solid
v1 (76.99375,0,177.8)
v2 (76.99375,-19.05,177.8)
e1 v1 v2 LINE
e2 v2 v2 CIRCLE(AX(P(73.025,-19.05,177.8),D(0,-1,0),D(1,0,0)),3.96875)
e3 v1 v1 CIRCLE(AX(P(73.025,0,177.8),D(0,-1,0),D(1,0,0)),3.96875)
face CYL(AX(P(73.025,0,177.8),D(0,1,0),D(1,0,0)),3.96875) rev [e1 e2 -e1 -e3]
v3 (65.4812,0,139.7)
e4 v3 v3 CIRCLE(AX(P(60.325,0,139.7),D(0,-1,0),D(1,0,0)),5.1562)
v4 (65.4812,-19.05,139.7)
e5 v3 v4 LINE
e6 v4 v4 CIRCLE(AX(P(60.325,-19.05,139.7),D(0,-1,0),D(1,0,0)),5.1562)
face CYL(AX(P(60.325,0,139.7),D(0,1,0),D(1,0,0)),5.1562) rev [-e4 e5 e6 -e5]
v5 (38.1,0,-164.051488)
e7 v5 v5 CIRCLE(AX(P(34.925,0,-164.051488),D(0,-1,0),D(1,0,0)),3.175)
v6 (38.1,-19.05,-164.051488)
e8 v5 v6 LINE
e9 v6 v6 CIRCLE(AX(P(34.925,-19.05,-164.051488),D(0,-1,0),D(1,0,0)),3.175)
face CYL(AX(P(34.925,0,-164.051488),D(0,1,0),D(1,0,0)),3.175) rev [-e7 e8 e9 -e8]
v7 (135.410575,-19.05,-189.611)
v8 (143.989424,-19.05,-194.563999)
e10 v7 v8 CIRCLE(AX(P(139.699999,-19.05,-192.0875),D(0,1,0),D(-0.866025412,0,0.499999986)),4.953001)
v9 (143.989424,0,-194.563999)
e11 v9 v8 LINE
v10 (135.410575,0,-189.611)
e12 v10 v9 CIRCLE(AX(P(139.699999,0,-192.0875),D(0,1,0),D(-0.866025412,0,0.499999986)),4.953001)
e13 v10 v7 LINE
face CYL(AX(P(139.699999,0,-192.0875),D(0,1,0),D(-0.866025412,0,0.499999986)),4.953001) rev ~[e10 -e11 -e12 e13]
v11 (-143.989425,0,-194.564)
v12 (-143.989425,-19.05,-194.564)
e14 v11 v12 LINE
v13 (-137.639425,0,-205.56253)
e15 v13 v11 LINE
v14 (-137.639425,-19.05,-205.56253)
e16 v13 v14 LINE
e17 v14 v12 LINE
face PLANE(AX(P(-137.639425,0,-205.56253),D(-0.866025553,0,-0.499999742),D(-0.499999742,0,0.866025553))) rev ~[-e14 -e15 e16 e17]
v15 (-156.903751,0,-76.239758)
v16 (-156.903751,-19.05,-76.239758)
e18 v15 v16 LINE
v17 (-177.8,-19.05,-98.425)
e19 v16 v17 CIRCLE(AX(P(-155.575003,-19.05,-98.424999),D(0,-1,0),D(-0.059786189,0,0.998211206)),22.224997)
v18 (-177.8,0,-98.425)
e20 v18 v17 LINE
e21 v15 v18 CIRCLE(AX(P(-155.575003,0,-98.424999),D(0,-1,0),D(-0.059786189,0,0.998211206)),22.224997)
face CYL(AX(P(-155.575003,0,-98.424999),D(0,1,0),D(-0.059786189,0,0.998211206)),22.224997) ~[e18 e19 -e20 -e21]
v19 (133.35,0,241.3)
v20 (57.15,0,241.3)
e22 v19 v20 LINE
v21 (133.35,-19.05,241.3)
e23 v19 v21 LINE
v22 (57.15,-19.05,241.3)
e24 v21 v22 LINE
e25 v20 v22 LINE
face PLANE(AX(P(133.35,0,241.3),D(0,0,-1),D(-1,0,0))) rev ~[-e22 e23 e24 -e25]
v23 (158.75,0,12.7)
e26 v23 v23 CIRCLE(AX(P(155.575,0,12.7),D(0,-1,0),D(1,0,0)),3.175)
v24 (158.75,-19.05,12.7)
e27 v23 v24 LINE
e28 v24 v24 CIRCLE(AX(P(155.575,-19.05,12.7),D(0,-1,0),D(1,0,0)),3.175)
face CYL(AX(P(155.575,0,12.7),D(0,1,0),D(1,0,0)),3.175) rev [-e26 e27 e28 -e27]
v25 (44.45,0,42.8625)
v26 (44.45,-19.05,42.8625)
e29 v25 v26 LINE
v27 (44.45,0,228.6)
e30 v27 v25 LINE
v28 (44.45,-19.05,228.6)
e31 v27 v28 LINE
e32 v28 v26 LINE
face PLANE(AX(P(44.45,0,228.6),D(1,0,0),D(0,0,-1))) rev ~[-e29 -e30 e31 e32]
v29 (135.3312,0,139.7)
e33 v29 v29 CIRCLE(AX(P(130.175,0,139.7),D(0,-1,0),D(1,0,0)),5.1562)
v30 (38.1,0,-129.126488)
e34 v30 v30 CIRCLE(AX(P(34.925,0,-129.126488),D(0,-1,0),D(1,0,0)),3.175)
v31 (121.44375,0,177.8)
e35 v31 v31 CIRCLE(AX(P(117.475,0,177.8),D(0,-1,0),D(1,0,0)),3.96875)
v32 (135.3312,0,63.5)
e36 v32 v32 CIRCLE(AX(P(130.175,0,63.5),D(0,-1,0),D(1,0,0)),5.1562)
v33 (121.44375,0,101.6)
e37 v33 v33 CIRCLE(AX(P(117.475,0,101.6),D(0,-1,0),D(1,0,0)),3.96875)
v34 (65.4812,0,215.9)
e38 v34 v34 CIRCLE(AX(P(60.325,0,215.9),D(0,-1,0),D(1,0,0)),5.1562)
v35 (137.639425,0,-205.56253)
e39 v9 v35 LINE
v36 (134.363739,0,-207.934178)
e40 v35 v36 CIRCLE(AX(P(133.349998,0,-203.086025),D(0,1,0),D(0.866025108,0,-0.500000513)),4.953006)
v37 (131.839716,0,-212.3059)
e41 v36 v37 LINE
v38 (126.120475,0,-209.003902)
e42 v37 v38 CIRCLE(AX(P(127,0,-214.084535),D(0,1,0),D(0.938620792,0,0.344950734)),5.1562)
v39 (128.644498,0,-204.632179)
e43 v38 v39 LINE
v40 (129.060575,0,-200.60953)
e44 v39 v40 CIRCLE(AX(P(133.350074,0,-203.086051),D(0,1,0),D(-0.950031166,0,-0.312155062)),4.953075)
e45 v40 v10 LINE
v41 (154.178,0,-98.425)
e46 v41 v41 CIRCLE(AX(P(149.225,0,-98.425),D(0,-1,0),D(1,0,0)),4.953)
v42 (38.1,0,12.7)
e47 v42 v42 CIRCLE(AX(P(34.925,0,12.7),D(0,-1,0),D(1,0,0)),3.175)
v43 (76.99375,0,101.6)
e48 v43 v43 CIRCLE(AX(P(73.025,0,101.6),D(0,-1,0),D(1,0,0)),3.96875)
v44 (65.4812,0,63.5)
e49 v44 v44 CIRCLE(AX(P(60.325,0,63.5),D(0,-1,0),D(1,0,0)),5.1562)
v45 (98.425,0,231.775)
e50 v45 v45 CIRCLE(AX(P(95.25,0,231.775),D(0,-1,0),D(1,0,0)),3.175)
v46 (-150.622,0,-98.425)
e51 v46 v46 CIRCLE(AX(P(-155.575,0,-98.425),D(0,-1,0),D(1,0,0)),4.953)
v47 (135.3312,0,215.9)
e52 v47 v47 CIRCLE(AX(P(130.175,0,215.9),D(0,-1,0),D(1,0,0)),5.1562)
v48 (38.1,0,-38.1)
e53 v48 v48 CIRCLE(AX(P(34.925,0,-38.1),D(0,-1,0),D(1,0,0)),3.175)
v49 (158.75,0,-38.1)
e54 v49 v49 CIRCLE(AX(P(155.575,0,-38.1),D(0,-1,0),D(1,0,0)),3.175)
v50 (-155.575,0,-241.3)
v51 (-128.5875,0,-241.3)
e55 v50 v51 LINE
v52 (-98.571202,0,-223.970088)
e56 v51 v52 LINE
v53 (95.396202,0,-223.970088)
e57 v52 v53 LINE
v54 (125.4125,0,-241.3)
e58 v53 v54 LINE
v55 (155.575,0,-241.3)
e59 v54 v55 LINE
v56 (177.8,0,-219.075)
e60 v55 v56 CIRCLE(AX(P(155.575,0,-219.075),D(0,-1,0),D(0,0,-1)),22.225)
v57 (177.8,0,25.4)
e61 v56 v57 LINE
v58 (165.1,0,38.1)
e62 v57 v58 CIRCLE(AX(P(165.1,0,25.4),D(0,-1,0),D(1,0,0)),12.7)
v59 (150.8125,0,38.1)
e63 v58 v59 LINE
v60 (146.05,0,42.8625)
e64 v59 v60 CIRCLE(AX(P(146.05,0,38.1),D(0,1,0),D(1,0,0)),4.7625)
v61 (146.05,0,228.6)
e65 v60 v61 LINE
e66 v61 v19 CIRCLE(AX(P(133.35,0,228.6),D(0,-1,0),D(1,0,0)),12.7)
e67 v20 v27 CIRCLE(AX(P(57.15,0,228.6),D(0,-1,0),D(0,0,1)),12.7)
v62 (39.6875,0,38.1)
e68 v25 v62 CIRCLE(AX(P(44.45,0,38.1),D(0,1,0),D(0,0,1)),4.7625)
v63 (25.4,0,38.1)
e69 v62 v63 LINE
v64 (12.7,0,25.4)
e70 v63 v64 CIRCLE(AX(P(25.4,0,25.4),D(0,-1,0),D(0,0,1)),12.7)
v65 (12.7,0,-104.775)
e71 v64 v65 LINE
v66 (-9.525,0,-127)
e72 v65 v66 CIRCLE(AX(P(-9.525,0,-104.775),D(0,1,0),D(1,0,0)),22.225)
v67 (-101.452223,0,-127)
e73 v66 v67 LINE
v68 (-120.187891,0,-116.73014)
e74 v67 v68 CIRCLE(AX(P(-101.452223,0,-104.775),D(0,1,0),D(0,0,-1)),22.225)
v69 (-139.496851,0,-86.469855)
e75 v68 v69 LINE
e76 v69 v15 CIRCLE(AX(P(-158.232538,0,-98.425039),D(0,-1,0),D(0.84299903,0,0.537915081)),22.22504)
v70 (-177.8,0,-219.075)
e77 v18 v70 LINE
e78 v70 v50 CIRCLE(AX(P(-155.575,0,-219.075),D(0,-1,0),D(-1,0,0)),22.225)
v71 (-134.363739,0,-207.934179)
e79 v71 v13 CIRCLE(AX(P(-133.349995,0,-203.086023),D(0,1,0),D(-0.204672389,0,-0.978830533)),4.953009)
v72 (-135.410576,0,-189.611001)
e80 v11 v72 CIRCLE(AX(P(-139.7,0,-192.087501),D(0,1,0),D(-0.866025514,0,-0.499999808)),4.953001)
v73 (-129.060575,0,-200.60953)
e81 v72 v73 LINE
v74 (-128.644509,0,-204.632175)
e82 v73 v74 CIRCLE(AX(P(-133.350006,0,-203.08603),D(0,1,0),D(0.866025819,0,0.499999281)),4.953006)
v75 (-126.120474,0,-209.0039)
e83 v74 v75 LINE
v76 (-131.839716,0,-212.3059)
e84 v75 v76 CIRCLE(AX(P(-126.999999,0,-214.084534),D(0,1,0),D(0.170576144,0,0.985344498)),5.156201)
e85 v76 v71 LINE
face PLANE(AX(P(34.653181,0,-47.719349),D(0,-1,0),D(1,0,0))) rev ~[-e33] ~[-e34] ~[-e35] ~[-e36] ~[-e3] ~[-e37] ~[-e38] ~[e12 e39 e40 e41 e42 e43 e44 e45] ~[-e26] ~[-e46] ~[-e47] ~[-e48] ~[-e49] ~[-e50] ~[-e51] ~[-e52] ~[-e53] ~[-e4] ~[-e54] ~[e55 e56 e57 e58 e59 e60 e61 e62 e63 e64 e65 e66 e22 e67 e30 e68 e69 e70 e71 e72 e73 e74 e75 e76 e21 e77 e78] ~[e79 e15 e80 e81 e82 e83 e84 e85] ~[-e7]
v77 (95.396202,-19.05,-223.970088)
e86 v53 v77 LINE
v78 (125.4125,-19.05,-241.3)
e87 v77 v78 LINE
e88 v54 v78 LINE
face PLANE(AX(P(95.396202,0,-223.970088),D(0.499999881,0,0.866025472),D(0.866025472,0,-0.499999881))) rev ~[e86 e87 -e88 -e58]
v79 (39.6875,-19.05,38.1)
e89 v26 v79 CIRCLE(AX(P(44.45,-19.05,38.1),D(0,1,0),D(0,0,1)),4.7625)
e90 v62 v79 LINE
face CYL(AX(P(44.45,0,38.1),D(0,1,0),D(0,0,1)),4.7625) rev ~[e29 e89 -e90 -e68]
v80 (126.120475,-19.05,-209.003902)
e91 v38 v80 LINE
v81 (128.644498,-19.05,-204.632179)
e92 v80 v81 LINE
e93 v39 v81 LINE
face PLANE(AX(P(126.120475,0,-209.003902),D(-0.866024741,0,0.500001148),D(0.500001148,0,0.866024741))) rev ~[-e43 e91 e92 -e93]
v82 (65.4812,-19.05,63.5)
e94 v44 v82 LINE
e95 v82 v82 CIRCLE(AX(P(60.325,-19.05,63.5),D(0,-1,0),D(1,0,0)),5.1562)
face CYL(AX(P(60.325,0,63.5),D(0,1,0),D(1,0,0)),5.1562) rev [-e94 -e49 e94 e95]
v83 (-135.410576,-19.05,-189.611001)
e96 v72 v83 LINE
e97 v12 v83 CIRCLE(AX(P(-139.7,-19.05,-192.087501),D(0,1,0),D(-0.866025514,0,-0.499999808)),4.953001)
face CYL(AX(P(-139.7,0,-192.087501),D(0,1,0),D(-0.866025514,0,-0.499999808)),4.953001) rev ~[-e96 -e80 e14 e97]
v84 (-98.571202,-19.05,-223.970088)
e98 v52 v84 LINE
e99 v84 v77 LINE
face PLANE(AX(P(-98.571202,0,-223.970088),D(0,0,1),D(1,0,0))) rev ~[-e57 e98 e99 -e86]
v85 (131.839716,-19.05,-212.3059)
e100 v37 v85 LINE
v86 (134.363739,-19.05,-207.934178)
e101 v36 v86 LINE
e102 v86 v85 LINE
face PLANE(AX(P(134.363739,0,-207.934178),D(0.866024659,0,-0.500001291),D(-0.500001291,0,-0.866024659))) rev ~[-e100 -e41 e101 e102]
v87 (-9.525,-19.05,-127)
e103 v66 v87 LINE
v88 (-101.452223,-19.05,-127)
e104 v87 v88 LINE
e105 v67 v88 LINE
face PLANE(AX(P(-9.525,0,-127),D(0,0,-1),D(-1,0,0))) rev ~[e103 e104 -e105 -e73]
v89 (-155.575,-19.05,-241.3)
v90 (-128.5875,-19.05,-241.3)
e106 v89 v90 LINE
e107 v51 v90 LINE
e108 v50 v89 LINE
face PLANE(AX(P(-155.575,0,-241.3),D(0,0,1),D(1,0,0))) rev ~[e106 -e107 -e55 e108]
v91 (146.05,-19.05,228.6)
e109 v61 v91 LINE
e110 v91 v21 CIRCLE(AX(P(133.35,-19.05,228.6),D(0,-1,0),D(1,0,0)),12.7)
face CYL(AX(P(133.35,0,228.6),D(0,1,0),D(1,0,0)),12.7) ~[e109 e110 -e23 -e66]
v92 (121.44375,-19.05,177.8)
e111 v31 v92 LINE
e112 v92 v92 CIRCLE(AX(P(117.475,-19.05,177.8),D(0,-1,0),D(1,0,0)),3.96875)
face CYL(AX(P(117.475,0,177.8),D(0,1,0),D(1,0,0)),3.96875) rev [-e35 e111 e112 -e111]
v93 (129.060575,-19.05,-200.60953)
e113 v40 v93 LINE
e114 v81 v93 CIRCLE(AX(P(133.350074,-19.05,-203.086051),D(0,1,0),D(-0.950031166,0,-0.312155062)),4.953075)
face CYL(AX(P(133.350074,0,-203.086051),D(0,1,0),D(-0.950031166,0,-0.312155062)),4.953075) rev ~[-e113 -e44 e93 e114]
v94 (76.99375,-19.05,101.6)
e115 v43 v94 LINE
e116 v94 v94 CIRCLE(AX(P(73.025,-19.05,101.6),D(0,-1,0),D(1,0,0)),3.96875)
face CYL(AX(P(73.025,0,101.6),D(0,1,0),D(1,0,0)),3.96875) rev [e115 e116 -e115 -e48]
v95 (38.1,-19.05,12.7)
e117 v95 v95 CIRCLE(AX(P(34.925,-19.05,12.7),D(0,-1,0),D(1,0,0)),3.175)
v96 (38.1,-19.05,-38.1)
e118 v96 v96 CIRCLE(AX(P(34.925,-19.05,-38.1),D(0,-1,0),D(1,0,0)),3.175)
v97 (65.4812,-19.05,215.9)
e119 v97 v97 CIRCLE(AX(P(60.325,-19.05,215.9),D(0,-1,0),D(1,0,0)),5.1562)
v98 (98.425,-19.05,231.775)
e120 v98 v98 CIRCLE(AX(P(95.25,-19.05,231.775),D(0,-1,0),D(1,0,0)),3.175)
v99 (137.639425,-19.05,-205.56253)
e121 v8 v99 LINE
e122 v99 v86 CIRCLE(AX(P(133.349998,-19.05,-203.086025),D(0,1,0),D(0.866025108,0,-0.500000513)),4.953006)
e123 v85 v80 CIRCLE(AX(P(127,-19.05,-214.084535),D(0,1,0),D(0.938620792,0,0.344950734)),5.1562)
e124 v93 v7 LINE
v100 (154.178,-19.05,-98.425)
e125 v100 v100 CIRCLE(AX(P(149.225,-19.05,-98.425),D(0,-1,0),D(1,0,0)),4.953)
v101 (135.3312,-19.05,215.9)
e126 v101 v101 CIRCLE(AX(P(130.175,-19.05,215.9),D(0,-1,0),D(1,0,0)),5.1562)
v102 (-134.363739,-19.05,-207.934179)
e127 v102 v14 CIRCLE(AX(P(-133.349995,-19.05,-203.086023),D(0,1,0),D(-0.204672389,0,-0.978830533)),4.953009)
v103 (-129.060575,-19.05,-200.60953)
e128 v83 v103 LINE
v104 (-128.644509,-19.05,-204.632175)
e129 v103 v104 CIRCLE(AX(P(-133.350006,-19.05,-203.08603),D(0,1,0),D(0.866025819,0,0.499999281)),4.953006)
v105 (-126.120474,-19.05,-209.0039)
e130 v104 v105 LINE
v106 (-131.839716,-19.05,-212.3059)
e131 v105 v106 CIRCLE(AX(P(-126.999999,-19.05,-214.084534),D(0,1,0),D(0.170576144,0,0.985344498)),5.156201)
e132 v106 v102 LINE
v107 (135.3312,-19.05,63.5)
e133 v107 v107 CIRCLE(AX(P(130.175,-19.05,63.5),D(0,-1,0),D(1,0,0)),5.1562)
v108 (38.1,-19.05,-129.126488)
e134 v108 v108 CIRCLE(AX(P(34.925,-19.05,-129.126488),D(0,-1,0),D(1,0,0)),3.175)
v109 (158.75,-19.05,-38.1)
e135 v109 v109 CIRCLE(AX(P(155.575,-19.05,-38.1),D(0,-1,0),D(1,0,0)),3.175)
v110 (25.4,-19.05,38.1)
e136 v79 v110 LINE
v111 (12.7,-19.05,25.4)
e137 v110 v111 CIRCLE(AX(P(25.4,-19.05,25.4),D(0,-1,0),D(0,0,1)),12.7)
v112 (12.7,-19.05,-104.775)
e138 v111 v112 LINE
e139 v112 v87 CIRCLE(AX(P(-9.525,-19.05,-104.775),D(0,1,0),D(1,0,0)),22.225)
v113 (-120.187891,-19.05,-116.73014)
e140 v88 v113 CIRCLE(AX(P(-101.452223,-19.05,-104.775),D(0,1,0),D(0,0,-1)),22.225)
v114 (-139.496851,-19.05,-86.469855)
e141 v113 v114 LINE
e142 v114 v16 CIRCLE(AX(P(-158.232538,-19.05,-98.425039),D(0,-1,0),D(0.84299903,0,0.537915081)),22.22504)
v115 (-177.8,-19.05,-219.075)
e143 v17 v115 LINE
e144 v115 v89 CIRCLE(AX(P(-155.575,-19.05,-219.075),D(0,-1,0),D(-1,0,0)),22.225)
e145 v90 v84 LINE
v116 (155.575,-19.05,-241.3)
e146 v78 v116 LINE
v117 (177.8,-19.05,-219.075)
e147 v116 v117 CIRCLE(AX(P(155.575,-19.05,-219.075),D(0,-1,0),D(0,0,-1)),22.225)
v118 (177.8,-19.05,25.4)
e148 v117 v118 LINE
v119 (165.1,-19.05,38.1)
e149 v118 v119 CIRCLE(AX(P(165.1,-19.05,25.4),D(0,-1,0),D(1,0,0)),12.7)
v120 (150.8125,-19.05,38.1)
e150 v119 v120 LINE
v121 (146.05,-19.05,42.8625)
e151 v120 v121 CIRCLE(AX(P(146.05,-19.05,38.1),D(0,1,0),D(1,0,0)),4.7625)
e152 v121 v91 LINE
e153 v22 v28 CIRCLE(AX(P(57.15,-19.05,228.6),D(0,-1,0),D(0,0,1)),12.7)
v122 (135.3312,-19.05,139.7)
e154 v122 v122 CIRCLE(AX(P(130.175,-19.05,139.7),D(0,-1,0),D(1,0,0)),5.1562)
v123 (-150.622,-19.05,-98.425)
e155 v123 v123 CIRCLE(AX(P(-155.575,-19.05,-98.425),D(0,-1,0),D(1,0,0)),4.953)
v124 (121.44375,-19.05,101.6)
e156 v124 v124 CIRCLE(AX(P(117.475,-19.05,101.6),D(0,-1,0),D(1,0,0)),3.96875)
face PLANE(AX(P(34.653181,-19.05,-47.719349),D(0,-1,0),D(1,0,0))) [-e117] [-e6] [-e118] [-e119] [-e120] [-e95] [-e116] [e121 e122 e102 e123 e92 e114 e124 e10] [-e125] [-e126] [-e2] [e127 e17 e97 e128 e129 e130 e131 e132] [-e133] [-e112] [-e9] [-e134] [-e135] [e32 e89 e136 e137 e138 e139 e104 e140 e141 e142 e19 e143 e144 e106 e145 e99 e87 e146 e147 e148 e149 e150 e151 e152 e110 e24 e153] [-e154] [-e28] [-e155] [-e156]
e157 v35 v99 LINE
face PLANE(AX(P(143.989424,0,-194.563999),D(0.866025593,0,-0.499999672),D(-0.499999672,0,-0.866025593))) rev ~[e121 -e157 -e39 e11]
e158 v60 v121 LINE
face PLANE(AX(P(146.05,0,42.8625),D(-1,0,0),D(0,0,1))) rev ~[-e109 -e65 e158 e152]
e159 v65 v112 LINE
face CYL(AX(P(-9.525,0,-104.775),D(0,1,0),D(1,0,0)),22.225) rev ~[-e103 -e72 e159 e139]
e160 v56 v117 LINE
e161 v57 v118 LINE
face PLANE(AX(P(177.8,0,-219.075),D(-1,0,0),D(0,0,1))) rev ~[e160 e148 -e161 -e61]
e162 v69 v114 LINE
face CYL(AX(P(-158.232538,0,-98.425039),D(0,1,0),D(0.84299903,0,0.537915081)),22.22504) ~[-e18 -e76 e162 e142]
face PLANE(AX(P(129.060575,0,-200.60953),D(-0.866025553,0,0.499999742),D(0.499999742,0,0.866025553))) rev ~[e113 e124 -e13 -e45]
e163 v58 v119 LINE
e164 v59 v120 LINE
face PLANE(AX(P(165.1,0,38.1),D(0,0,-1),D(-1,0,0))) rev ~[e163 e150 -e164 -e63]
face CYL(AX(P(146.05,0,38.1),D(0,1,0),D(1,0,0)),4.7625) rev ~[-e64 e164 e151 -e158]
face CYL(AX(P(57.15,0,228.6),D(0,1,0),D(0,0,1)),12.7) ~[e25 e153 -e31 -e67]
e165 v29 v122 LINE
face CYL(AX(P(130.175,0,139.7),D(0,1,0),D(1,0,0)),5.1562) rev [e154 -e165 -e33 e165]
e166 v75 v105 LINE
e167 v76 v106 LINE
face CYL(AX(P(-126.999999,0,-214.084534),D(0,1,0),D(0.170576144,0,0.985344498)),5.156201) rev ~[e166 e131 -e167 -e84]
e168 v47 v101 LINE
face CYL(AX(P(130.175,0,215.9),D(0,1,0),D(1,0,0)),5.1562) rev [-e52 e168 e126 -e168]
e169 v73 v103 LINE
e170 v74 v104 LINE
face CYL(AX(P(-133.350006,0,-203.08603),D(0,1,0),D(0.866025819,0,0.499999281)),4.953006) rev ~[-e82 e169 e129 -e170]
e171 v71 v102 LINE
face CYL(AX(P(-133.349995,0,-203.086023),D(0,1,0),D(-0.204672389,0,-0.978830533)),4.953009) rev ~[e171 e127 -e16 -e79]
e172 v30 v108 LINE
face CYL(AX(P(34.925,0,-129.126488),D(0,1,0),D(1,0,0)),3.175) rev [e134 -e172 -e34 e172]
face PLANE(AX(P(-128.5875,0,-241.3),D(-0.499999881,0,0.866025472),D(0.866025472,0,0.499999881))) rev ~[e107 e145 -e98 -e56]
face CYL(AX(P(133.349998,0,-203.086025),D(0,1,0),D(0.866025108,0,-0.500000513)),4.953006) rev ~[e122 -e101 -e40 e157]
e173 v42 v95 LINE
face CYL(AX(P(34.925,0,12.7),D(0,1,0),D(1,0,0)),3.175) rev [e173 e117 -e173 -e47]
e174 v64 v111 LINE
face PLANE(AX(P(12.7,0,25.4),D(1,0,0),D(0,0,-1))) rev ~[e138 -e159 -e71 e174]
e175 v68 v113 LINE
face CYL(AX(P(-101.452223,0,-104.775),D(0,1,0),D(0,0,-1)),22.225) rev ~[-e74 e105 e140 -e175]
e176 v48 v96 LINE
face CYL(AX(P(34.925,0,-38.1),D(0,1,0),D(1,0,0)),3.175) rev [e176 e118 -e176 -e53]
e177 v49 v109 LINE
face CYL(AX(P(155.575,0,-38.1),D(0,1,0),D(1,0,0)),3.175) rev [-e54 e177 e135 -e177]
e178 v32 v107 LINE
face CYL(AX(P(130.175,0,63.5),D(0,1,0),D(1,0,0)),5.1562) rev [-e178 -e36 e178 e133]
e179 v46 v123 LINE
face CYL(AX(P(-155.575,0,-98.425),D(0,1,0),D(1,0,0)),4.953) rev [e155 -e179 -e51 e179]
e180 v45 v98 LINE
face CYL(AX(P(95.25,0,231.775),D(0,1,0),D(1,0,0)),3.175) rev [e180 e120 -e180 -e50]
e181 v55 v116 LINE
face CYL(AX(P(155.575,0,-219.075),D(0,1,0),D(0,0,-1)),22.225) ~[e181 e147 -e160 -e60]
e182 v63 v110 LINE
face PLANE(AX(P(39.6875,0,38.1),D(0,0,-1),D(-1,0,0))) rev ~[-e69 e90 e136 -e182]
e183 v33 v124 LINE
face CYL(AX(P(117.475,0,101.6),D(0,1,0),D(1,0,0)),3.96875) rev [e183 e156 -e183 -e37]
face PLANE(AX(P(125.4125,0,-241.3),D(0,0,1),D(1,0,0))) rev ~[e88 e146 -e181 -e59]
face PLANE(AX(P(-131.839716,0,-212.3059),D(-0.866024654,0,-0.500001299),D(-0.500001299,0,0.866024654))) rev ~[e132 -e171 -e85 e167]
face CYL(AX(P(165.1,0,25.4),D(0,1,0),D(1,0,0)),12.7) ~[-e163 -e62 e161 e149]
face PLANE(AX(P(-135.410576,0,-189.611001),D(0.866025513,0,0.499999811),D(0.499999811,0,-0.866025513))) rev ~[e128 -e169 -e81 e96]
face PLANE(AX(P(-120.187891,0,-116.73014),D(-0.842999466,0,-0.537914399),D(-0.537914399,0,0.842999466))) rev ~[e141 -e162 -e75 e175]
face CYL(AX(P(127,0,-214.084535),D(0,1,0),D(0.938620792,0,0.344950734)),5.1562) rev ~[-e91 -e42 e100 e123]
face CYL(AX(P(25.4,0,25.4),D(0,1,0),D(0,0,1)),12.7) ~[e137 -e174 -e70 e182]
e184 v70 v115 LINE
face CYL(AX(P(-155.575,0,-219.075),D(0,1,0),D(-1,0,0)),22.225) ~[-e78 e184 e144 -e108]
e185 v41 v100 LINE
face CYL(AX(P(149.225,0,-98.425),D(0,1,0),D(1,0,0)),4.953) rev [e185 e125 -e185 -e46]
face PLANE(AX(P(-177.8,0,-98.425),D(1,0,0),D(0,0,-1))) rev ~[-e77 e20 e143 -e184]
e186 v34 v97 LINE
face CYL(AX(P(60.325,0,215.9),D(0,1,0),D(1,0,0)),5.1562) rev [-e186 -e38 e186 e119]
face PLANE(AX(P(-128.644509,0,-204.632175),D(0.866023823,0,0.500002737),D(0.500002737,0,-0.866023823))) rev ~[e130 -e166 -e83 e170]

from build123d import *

# Parameters (mm, degrees)
F0_R     = 4.953
F0_R_2   = 3.175
F0_R_3   = 5.1562
F0_R_4   = 3.96875
F1_DEPTH = 19.05


# Not quite as in the source:
# - ends of sketch curves that miss each other by under 0.0002 mm in the source are joined


with BuildPart() as f1:
    # F0 (on Front) → F1 (new body)
    with BuildSketch(Plane.XZ):
        with BuildLine():
            ThreePointArc((177.8, 25.4), (174.0802561211, 34.3802561211), (165.1, 38.1))
            Line((165.1, 38.1), (150.8125, 38.1))
            ThreePointArc((150.8125, 38.1), (142.6824039546, 34.7324039546), (146.05, 42.8625))
            Line((146.05, 42.8625), (146.05, 228.6))
            ThreePointArc((146.05, 228.6), (142.3302561211, 237.5802561211), (133.35, 241.3))
            Line((133.35, 241.3), (57.15, 241.3))
            ThreePointArc((57.15, 241.3), (48.1697438789, 237.5802561211), (44.45, 228.6))
            Line((44.45, 228.6), (44.45, 42.8625))
            ThreePointArc((44.45, 42.8625), (47.8175960454, 34.7324039546), (39.6875, 38.1))
            Line((39.6875, 38.1), (25.4, 38.1))
            ThreePointArc((25.4, 38.1), (16.4197438789, 34.3802561211), (12.7, 25.4))
            Line((12.7, 25.4), (12.7, -104.775))
            ThreePointArc((12.7, -104.775), (6.1904482119, -120.4904482119), (-9.525, -127))
            Line((-9.525, -127), (-101.4522228, -127))
            ThreePointArc((-101.4522228, -127), (-112.1350976667, -124.2641459429), (-120.1878905046, -116.7301403448))
            Line((-120.1878905046, -116.7301403448), (-139.4968508, -86.469855))
            ThreePointArc((-139.4968508, -86.469855), (-146.9715660509, -79.2640655101), (-156.9037505938, -76.2397575751))
            ThreePointArc((-156.9037505938, -76.2397575751), (-171.7534129546, -83.1865755647), (-177.8, -98.425))
            Line((-177.8, -98.425), (-177.8, -219.075))
            ThreePointArc((-177.8, -219.075), (-171.2904482119, -234.7904482119), (-155.575, -241.3))
            Line((-155.575, -241.3), (-128.5875, -241.3))
            Line((-128.5875, -241.3), (-98.5712024, -223.970088))
            Line((-98.5712024, -223.970088), (95.3962024, -223.970088))
            Line((95.3962024, -223.970088), (125.4125, -241.3))
            Line((125.4125, -241.3), (155.575, -241.3))
            ThreePointArc((155.575, -241.3), (171.2904482119, -234.7904482119), (177.8, -219.075))
            Line((177.8, -219.075), (177.8, 25.4))
        make_face()
        with BuildLine():
            Line((-137.639425, -205.5625302), (-143.989425, -194.564))
            ThreePointArc((-143.989425, -194.564), (-142.1764994912, -187.7980758813), (-135.4105758813, -189.6110005088))
            Line((-135.4105758813, -189.6110005088), (-129.060575, -200.6095302))
            ThreePointArc((-129.060575, -200.6095302), (-128.4232829137, -202.5764541494), (-128.6445091035, -204.6321752201))
            Line((-128.6445091035, -204.6321752201), (-126.1204742, -209.0039))
            ThreePointArc((-126.1204742, -209.0039), (-124.4219046114, -218.5499378494), (-131.8397164566, -212.3058998322))
            Line((-131.8397164566, -212.3058998322), (-134.3637394, -207.934179))
            ThreePointArc((-134.3637394, -207.934179), (-136.2546626338, -207.0979055699), (-137.639425, -205.5625302))
        make_face(mode=Mode.SUBTRACT)
        with Locations((-155.575, -98.425)):
            Circle(F0_R, mode=Mode.SUBTRACT)
        with Locations((34.925, -164.051488)):
            Circle(F0_R_2, mode=Mode.SUBTRACT)
        with Locations((34.925, -129.126488)):
            Circle(F0_R_2, mode=Mode.SUBTRACT)
        with BuildLine():
            Line((129.060575, -200.6095302), (135.410575, -189.611))
            ThreePointArc((135.410575, -189.611), (142.1764994912, -187.7980758813), (143.9894241187, -194.5639994912))
            Line((143.9894241187, -194.5639994912), (137.639425, -205.5625302))
            ThreePointArc((137.639425, -205.5625302), (136.2546626338, -207.0979055699), (134.3637392893, -207.9341784706))
            Line((134.3637392893, -207.9341784706), (131.839716, -212.3059))
            ThreePointArc((131.839716, -212.3059), (124.4219046114, -218.5499378494), (126.1204745175, -209.0039018342))
            Line((126.1204745175, -209.0039018342), (128.6444976, -204.632179))
            ThreePointArc((128.6444976, -204.632179), (128.4232829137, -202.5764541494), (129.060575, -200.6095302))
        make_face(mode=Mode.SUBTRACT)
        with Locations((34.925, -38.1)):
            Circle(F0_R_2, mode=Mode.SUBTRACT)
        with Locations((149.225, -98.425)):
            Circle(F0_R, mode=Mode.SUBTRACT)
        with Locations((155.575, -38.1)):
            Circle(F0_R_2, mode=Mode.SUBTRACT)
        with Locations((34.925, 12.7)):
            Circle(F0_R_2, mode=Mode.SUBTRACT)
        with Locations((60.325, 63.5)):
            Circle(F0_R_3, mode=Mode.SUBTRACT)
        with Locations((73.025, 101.6)):
            Circle(F0_R_4, mode=Mode.SUBTRACT)
        with Locations((155.575, 12.7)):
            Circle(F0_R_2, mode=Mode.SUBTRACT)
        with Locations((130.175, 63.5)):
            Circle(F0_R_3, mode=Mode.SUBTRACT)
        with Locations((117.475, 101.6)):
            Circle(F0_R_4, mode=Mode.SUBTRACT)
        with Locations((60.325, 139.7)):
            Circle(F0_R_3, mode=Mode.SUBTRACT)
        with Locations((73.025, 177.8)):
            Circle(F0_R_4, mode=Mode.SUBTRACT)
        with Locations((60.325, 215.9)):
            Circle(F0_R_3, mode=Mode.SUBTRACT)
        with Locations((130.175, 139.7)):
            Circle(F0_R_3, mode=Mode.SUBTRACT)
        with Locations((117.475, 177.8)):
            Circle(F0_R_4, mode=Mode.SUBTRACT)
        with Locations((95.25, 231.775)):
            Circle(F0_R_2, mode=Mode.SUBTRACT)
        with Locations((130.175, 215.9)):
            Circle(F0_R_3, mode=Mode.SUBTRACT)
    extrude(amount=F1_DEPTH)


solid = f1.part
